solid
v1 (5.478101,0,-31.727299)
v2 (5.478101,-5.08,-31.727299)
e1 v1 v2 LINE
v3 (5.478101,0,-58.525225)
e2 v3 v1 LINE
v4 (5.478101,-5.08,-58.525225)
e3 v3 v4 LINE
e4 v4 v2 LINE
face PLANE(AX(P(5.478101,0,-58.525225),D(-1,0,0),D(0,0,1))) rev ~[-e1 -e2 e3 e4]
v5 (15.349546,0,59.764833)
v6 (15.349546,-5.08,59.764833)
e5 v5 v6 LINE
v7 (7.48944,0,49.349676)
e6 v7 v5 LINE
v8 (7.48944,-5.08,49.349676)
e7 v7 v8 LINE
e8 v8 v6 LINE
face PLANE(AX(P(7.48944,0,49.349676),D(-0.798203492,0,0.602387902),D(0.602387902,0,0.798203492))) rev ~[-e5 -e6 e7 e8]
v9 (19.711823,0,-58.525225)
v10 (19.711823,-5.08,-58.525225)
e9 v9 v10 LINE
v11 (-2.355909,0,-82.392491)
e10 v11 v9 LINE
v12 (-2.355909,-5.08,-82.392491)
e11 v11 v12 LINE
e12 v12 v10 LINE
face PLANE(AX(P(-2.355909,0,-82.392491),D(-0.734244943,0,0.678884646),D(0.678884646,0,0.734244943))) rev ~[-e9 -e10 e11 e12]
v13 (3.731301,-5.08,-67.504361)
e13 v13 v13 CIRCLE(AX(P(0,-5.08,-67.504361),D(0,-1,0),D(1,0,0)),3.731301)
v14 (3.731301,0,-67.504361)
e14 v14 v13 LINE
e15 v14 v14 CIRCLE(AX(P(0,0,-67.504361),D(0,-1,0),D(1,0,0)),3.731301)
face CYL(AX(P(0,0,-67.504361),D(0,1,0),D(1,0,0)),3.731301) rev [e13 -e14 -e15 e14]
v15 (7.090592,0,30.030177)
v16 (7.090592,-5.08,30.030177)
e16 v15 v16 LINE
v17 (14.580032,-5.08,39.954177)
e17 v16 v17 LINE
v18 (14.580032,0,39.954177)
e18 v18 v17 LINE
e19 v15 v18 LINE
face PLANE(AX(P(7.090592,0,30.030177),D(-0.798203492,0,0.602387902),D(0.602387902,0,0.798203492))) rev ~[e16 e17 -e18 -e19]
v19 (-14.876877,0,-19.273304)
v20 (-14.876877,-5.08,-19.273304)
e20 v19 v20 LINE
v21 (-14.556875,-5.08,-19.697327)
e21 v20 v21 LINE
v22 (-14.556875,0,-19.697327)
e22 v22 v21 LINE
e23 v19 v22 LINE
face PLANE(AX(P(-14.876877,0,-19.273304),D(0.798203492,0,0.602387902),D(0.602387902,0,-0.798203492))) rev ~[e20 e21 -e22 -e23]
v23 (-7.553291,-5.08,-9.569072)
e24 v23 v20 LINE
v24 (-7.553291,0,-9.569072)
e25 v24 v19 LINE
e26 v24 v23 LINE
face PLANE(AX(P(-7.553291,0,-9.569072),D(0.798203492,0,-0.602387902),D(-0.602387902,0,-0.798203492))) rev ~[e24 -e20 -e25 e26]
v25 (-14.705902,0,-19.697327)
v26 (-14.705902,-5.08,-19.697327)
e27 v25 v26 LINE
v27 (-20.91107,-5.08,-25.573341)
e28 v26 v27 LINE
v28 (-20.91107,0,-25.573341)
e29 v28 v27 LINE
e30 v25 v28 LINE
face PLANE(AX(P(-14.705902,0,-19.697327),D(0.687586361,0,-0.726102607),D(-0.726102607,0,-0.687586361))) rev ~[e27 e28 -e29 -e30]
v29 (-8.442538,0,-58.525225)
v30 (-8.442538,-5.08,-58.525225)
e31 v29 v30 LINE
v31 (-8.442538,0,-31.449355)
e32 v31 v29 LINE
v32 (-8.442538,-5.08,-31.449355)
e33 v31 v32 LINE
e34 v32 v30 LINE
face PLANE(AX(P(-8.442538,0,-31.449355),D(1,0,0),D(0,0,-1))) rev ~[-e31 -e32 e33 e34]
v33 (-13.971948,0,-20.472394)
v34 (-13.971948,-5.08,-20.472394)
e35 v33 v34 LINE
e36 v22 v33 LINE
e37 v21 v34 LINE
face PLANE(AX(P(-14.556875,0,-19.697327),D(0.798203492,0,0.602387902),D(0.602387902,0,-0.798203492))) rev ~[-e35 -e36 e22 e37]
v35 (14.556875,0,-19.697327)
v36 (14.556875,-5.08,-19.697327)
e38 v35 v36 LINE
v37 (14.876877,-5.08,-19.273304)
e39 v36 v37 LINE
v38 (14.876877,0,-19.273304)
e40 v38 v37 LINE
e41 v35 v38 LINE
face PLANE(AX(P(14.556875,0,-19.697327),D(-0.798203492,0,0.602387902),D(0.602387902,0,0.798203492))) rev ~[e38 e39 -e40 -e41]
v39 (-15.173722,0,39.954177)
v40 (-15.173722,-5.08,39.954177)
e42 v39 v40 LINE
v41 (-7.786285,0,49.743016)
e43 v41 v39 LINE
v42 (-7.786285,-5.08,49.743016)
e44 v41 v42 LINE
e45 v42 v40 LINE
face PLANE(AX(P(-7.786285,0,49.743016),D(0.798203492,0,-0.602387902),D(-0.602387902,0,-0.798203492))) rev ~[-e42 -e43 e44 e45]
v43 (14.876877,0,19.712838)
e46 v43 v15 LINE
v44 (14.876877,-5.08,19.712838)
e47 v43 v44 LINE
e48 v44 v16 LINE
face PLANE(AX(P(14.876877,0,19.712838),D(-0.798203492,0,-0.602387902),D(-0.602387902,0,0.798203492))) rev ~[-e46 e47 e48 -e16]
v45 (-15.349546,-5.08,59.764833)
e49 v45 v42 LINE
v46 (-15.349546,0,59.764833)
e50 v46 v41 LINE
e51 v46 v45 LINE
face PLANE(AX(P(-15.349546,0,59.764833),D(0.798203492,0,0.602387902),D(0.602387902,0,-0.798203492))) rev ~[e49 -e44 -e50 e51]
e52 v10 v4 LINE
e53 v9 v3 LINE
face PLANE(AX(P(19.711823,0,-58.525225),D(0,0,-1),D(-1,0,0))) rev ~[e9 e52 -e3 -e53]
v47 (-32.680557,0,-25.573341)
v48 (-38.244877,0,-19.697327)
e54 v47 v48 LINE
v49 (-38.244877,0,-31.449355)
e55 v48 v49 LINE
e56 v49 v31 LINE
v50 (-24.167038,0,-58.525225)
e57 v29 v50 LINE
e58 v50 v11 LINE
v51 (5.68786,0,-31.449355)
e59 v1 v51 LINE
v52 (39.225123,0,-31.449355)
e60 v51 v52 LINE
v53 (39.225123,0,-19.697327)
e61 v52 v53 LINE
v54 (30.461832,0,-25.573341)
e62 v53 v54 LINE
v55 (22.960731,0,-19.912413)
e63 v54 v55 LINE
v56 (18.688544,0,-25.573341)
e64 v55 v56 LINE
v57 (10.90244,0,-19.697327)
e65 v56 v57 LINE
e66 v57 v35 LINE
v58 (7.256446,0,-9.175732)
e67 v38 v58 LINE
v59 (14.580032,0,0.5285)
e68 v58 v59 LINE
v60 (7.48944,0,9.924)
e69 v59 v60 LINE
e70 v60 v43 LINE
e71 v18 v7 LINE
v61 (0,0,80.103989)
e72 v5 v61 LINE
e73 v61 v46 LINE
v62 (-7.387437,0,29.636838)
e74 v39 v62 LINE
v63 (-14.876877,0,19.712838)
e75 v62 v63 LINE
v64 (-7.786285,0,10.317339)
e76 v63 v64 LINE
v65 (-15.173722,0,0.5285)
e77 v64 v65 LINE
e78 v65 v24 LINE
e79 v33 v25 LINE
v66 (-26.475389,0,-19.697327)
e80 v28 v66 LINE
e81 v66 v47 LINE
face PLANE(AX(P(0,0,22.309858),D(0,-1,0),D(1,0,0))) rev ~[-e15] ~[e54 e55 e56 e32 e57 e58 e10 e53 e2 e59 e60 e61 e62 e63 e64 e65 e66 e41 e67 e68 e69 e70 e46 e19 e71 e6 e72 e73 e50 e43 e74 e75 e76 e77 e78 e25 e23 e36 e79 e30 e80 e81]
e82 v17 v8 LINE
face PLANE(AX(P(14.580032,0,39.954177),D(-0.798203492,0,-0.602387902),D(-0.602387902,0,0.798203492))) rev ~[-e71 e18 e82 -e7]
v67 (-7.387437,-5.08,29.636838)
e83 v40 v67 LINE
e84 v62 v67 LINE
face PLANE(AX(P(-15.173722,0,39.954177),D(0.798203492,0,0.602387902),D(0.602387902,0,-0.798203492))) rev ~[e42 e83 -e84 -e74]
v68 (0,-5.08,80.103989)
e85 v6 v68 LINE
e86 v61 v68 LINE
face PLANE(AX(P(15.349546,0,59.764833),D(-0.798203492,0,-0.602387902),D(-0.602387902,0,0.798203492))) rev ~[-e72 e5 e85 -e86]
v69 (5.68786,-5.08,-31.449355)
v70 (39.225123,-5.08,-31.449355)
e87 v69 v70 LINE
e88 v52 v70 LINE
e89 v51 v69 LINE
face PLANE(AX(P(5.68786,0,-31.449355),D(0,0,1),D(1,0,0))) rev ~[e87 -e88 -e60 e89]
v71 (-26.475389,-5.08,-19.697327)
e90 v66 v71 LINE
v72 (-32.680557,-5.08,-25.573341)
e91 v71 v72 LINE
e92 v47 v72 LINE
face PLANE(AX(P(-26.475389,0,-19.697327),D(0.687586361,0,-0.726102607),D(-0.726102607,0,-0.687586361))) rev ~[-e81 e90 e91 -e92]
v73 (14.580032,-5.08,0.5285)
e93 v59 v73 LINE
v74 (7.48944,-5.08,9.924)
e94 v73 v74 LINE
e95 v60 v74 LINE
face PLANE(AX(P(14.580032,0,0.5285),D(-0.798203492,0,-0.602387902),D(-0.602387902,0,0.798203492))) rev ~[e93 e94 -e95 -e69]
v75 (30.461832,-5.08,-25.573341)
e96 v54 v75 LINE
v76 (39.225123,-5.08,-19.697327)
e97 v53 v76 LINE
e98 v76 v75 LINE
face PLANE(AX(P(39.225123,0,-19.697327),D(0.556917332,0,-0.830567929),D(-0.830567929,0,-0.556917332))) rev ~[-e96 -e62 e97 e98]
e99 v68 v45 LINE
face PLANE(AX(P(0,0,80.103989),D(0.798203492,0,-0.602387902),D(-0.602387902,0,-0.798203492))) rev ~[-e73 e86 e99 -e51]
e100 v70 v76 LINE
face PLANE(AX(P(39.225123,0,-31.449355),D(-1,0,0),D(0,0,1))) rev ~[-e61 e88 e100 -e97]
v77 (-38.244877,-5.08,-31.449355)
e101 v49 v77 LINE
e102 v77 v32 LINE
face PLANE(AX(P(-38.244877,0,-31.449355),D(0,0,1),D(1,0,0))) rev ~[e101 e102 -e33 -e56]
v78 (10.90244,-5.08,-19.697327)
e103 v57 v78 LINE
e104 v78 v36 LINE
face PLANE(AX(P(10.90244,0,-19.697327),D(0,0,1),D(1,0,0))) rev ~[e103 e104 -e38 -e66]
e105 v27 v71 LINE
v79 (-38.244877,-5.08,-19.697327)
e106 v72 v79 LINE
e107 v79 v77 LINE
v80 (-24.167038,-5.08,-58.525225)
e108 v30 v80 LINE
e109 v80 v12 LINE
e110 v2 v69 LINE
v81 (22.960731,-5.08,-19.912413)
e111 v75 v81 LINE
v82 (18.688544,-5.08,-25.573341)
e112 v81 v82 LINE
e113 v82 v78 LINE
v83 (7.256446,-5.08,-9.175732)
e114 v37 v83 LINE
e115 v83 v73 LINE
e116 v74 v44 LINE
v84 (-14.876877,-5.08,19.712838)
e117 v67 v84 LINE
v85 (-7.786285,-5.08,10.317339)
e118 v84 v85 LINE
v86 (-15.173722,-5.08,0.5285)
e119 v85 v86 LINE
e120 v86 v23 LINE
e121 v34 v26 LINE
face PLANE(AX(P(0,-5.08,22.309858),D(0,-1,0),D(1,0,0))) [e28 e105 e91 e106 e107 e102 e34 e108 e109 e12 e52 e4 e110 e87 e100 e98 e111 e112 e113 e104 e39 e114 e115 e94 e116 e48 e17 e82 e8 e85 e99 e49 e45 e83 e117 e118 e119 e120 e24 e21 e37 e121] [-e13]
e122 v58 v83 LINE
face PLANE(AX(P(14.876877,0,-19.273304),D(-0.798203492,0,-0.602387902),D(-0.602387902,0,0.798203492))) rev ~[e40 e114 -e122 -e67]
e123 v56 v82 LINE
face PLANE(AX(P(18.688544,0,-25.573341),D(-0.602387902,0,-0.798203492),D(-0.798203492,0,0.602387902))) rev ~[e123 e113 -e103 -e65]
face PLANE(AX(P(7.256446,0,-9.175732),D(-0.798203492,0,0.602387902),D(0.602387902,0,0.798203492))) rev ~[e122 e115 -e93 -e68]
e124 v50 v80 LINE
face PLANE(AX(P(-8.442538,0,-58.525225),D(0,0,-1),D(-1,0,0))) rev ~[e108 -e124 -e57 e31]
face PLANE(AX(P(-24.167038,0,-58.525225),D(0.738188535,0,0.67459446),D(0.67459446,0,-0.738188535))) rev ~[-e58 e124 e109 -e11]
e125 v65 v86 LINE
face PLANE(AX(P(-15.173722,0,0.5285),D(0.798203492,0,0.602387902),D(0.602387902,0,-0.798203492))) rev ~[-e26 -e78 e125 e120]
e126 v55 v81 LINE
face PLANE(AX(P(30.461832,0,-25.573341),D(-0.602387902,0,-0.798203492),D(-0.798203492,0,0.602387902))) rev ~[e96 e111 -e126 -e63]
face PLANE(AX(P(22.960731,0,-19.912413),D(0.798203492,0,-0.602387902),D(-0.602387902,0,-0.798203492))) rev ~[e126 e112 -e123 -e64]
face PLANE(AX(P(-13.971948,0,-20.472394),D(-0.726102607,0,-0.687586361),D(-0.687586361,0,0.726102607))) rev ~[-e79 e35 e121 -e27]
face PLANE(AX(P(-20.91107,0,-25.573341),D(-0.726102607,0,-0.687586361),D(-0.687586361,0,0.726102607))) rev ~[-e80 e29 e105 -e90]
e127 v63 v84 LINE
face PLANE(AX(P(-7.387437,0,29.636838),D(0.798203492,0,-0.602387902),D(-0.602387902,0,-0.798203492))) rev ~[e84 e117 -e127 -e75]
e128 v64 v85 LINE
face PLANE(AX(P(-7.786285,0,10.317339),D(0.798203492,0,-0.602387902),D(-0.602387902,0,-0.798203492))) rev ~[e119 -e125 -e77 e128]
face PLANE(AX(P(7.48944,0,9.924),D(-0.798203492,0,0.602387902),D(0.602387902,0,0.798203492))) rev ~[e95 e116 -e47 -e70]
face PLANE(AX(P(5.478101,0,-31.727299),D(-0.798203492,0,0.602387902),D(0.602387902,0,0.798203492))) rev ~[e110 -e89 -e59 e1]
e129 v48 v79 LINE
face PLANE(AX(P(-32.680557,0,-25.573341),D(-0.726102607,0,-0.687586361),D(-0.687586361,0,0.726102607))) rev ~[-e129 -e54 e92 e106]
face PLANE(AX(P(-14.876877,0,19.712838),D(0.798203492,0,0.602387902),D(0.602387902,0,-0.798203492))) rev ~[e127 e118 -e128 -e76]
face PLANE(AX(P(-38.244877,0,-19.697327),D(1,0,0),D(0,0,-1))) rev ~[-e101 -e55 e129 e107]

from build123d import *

# Parameters (mm, degrees)
F0_R     = 3.7313011015
F1_DEPTH = 5.08


# Not quite as in the source:
# - a feature names something its author has since deleted; it is built from what else it names


with BuildPart() as f1:
    # F0 (on Front) → F1 (new body)
    with BuildSketch(Plane.XZ):
        Polygon((-0.2968451337, 20.2413384518), (7.4894401646, 9.9239995871), (14.8768772094, 19.7128383483), (7.0905919112, 30.0301772131), (0, 39.4256766967), (-7.3874370448, 29.6368379354), (-14.8768772094, 19.7128383483), (-7.7862852982, 10.3173388647), align=None)
        Polygon((14.5800320757, 0.5285001035), (7.4894401646, 9.9239995871), (-0.2968451337, 20.2413384518), (-7.7862852982, 10.3173388647), (-15.1737223431, 0.5285001035), (-7.5532907703, -9.5690716936), (0, 0.4395341352), (7.2564456366, -9.175732416), align=None)
        Polygon((0, 39.4256766967), (7.0905919112, 30.0301772131), (14.5800320757, 39.9541768002), (7.4894401646, 49.3496762838), (-0.2968451337, 59.6670151485), (-7.7862852982, 49.7430155614), (-15.1737223431, 39.9541768002), (-7.3874370448, 29.6368379354), align=None)
        Polygon((14.8768772094, -19.2733042131), (7.2564456366, -9.175732416), (0, 0.4395341352), (-7.5532907703, -9.5690716936), (-14.8768772094, -19.2733042131), (-14.5568754898, -19.6973274863), (10.9024396727, -19.6973274863), (14.5568754898, -19.6973274863), align=None)
        Polygon((-0.2968451337, 59.6670151485), (7.4894401646, 49.3496762838), (15.3495463603, 59.7648326808), (0, 80.103988665), (-15.3495463602, 59.7648326808), (-7.7862852982, 49.7430155614), align=None)
        Polygon((6.4679318367, -25.5733413094), (10.9024396727, -19.6973274863), (-14.5568754898, -19.6973274863), (-13.9719483627, -20.4723943058), (-9.1415820241, -25.5733413094), (-1.0331695214, -19.9124130418), align=None)
        Polygon((18.6885435032, -25.5733413094), (10.9024396727, -19.6973274863), (6.4679318367, -25.5733413094), (-1.0331695214, -19.9124130418), (-9.1415820241, -25.5733413094), (-13.9719483627, -20.4723943058), (-14.7059016213, -19.6973274863), (-20.9110697187, -25.5733413094), (-26.4753893159, -19.6973274863), (-32.6805574134, -25.5733413094), (-38.2448770106, -19.6973274863), (-38.2448770106, -31.4493551324), (-8.4425376974, -31.4493551324), (5.4781014785, -31.4493551324), (5.6878598178, -31.4493551324), (39.2251229894, -31.4493551324), (39.2251229894, -19.6973274863), (30.4618320136, -25.5733413094), (22.9607306555, -19.9124130418), align=None)
        Polygon((5.4781014785, -31.7272986938), (5.6878598178, -31.4493551324), (5.4781014785, -31.4493551324), align=None)
        Polygon((5.4781014785, -58.5252254202), (5.4781014785, -31.7272986938), (5.4781014785, -31.4493551324), (-8.4425376974, -31.4493551324), (-8.4425376974, -58.5252254202), align=None)
        Polygon((19.711822737, -58.5252254202), (5.4781014785, -58.5252254202), (-8.4425376974, -58.5252254202), (-24.1670380346, -58.5252254202), (-2.355908975, -82.3924914002), align=None)
        with Locations((0, -67.5043612719)):
            Circle(F0_R, mode=Mode.SUBTRACT)
    extrude(amount=F1_DEPTH)


solid = f1.part
